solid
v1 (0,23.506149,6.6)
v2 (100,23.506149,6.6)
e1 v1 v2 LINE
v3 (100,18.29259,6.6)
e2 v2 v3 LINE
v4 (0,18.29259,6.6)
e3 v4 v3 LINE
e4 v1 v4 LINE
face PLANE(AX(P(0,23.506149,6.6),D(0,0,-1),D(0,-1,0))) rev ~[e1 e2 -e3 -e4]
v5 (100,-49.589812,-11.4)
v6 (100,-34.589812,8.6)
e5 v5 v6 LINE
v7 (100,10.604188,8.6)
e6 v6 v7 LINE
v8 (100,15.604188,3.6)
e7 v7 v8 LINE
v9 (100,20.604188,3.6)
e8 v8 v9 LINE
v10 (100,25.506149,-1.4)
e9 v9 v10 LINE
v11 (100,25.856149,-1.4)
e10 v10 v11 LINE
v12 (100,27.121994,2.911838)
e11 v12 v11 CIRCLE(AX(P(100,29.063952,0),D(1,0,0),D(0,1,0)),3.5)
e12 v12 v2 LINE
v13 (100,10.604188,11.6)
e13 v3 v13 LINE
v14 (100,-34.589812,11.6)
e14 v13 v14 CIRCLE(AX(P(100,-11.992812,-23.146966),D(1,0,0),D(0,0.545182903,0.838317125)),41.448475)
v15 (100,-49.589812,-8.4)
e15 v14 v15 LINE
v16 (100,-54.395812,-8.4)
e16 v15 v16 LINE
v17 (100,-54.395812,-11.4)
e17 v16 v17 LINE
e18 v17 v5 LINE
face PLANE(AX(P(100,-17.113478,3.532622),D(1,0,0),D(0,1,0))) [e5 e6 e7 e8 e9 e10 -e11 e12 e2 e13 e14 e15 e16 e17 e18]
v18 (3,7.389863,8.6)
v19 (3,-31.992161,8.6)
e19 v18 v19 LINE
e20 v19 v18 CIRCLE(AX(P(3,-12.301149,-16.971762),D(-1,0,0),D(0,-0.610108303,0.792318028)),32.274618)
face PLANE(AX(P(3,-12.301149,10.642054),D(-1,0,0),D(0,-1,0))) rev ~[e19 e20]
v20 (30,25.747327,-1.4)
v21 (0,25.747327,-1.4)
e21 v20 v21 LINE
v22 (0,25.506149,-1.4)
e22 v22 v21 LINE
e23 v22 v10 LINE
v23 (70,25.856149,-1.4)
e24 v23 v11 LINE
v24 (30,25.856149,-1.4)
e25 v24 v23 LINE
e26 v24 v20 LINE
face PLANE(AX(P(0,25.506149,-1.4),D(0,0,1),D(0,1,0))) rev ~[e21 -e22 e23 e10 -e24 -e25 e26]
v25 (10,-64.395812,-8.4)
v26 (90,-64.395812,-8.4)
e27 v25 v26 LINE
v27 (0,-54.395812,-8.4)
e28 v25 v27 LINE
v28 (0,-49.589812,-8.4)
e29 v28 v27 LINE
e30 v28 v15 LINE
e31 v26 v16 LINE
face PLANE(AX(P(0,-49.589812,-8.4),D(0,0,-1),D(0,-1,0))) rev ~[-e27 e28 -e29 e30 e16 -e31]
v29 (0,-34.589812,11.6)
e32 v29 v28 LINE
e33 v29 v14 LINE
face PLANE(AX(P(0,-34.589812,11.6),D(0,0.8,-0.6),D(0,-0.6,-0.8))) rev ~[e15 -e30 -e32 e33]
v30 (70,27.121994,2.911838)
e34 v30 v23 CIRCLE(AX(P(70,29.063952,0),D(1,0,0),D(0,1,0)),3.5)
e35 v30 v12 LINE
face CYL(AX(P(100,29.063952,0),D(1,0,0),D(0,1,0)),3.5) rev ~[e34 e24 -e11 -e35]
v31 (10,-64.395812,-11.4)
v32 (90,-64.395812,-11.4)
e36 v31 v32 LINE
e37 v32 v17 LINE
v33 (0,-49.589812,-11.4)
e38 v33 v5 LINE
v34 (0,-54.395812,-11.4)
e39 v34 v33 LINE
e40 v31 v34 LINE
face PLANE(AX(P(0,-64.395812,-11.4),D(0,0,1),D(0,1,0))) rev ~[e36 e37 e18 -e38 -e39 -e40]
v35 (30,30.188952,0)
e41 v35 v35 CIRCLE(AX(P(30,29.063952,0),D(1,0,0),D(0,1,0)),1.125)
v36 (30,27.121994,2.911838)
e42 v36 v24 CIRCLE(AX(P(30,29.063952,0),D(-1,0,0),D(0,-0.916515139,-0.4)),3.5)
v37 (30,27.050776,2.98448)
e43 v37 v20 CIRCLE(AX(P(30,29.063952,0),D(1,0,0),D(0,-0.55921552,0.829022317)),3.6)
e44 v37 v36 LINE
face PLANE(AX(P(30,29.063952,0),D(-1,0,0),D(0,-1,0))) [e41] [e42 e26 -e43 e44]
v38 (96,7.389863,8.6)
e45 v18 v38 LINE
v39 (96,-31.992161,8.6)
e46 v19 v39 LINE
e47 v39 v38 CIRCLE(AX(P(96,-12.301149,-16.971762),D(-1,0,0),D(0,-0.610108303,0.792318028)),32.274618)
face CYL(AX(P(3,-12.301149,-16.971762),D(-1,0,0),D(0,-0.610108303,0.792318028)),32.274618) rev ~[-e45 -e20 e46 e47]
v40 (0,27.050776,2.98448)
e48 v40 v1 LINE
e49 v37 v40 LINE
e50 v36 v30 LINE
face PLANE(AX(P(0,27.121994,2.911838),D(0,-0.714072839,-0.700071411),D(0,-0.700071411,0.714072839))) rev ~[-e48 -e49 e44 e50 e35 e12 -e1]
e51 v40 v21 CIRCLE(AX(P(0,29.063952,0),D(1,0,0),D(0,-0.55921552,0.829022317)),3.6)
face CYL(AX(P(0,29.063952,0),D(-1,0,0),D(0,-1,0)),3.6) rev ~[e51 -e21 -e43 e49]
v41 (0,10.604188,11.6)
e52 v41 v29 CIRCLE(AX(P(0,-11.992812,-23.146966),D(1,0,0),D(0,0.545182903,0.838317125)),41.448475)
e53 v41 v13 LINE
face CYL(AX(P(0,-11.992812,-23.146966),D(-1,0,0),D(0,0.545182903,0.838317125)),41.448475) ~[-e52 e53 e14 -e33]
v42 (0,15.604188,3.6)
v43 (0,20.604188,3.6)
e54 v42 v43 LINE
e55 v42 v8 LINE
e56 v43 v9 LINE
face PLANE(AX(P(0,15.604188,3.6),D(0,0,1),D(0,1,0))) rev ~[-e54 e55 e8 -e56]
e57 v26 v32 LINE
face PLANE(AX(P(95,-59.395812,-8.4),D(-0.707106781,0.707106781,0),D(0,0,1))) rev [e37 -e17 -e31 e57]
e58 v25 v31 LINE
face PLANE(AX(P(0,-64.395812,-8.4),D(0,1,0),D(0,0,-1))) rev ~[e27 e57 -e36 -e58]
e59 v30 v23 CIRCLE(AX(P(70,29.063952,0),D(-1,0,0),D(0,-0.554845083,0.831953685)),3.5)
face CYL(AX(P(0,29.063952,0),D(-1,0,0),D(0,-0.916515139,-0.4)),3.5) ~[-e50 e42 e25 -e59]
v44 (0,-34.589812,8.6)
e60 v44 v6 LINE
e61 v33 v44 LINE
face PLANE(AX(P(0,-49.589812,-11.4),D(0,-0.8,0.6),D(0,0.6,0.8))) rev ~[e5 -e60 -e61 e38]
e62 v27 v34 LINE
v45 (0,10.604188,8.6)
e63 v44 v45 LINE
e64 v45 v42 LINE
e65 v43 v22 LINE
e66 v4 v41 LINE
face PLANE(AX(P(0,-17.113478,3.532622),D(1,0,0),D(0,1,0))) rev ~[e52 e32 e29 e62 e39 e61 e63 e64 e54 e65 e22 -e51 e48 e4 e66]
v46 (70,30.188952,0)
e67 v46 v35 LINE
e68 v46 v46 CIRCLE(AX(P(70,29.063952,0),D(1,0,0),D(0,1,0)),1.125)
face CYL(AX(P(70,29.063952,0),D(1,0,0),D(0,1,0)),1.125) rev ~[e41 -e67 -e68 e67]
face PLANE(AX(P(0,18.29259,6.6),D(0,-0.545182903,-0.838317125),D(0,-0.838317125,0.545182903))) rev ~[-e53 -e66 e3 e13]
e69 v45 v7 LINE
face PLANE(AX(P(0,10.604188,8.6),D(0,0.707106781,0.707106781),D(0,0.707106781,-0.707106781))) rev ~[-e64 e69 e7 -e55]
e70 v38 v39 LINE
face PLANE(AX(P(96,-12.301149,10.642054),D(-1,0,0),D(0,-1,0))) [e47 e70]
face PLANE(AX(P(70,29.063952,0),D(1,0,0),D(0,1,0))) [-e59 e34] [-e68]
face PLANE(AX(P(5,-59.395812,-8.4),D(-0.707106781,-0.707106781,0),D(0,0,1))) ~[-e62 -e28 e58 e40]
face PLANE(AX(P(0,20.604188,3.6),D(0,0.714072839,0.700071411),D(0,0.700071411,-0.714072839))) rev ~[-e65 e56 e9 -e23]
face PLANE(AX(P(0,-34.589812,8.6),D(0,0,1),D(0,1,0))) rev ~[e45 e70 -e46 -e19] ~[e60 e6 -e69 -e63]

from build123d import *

# Parameters (mm, degrees)
F1_DEPTH  = 100
F2_SIZE   = 10
F3_R      = 3.5
F4_DEPTH  = 30
F5_R      = 3.6
F6_DEPTH  = 30
F7_R      = 1.125
F8_DEPTH  = 40
F11_DEPTH = 93


# Not quite as in the source:
# - a feature names something its author has since deleted; it is built from what else it names


with BuildPart() as f1:
    # F0 (on Right) → F1 (new body)
    with BuildSketch(Plane.YZ):
        with BuildLine():
            Line((25.5061486276, -1.4), (25.8561486276, -1.4))
            ThreePointArc((25.8561486276, -1.4), (32.4222243139, -0.9859028724), (27.1219938253, 2.9118378984))
            Line((27.1219938253, 2.9118378984), (23.5061486276, 6.6))
            Line((23.5061486276, 6.6), (18.2925903906, 6.6))
            Line((18.2925903906, 6.6), (10.6041878433, 11.6))
            Line((10.6041878433, 11.6), (-34.5898121567, 11.6))
            Line((-34.5898121567, 11.6), (-49.5898121567, -8.4))
            Line((-49.5898121567, -8.4), (-64.3958121567, -8.4))
            Line((-64.3958121567, -8.4), (-64.3958121567, -11.4))
            Line((-64.3958121567, -11.4), (-49.5898121567, -11.4))
            Line((-49.5898121567, -11.4), (-34.5898121567, 8.6))
            Line((-34.5898121567, 8.6), (10.6041878433, 8.6))
            Line((10.6041878433, 8.6), (15.6041878433, 3.6))
            Line((15.6041878433, 3.6), (20.6041878433, 3.6))
            Line((20.6041878433, 3.6), (25.5061486276, -1.4))
        make_face()
        with BuildLine():
            Line((-34.5898121567, 11.6), (10.6041878433, 11.6))
            ThreePointArc((10.6041878433, 11.6), (-11.9928121567, 18.3015086266), (-34.5898121567, 11.6))
        make_face()
    extrude(amount=F1_DEPTH)

    # F2
    f2_edges = [f1.edges().sort_by_distance(p)[0] for p in [
        (100, -64.395812, -9.9),
        (0, -64.395812, -9.9),
    ]]
    chamfer(f2_edges, length=F2_SIZE)

    # F3 (on face) → F4 (cut)
    with BuildSketch(Plane.YZ.offset(100)):
        with Locations((29.0639516141, 0)):
            Circle(F3_R)
    extrude(amount=-F4_DEPTH, mode=Mode.SUBTRACT)

    # F5 (on face) → F6 (cut)
    with BuildSketch(Plane(origin=(0, 0, 0), x_dir=(0, -1, 0), z_dir=(-1, 0, 0))):
        with Locations((-29.0639516141, 0)):
            Circle(F5_R)
    extrude(amount=-F6_DEPTH, mode=Mode.SUBTRACT)

    # F7 (on face) → F8 (cut, through all)
    with BuildSketch(Plane.YZ.offset(70)):
        with Locations((29.0639516141, 0)):
            Circle(F7_R)
    extrude(amount=-F8_DEPTH, mode=Mode.SUBTRACT)

    # F10 (on offset) → F11 (cut)
    with BuildSketch(Plane(origin=(3, 0, 0), x_dir=(0, -1, 0), z_dir=(-1, 0, 0))):
        with BuildLine():
            Line((-7.3898630986, 8.6), (31.992161455, 8.6))
            ThreePointArc((31.992161455, 8.6), (12.3011491782, 15.3028562463), (-7.3898630986, 8.6))
        make_face()
    extrude(amount=-F11_DEPTH, mode=Mode.SUBTRACT)


solid = f1.part
